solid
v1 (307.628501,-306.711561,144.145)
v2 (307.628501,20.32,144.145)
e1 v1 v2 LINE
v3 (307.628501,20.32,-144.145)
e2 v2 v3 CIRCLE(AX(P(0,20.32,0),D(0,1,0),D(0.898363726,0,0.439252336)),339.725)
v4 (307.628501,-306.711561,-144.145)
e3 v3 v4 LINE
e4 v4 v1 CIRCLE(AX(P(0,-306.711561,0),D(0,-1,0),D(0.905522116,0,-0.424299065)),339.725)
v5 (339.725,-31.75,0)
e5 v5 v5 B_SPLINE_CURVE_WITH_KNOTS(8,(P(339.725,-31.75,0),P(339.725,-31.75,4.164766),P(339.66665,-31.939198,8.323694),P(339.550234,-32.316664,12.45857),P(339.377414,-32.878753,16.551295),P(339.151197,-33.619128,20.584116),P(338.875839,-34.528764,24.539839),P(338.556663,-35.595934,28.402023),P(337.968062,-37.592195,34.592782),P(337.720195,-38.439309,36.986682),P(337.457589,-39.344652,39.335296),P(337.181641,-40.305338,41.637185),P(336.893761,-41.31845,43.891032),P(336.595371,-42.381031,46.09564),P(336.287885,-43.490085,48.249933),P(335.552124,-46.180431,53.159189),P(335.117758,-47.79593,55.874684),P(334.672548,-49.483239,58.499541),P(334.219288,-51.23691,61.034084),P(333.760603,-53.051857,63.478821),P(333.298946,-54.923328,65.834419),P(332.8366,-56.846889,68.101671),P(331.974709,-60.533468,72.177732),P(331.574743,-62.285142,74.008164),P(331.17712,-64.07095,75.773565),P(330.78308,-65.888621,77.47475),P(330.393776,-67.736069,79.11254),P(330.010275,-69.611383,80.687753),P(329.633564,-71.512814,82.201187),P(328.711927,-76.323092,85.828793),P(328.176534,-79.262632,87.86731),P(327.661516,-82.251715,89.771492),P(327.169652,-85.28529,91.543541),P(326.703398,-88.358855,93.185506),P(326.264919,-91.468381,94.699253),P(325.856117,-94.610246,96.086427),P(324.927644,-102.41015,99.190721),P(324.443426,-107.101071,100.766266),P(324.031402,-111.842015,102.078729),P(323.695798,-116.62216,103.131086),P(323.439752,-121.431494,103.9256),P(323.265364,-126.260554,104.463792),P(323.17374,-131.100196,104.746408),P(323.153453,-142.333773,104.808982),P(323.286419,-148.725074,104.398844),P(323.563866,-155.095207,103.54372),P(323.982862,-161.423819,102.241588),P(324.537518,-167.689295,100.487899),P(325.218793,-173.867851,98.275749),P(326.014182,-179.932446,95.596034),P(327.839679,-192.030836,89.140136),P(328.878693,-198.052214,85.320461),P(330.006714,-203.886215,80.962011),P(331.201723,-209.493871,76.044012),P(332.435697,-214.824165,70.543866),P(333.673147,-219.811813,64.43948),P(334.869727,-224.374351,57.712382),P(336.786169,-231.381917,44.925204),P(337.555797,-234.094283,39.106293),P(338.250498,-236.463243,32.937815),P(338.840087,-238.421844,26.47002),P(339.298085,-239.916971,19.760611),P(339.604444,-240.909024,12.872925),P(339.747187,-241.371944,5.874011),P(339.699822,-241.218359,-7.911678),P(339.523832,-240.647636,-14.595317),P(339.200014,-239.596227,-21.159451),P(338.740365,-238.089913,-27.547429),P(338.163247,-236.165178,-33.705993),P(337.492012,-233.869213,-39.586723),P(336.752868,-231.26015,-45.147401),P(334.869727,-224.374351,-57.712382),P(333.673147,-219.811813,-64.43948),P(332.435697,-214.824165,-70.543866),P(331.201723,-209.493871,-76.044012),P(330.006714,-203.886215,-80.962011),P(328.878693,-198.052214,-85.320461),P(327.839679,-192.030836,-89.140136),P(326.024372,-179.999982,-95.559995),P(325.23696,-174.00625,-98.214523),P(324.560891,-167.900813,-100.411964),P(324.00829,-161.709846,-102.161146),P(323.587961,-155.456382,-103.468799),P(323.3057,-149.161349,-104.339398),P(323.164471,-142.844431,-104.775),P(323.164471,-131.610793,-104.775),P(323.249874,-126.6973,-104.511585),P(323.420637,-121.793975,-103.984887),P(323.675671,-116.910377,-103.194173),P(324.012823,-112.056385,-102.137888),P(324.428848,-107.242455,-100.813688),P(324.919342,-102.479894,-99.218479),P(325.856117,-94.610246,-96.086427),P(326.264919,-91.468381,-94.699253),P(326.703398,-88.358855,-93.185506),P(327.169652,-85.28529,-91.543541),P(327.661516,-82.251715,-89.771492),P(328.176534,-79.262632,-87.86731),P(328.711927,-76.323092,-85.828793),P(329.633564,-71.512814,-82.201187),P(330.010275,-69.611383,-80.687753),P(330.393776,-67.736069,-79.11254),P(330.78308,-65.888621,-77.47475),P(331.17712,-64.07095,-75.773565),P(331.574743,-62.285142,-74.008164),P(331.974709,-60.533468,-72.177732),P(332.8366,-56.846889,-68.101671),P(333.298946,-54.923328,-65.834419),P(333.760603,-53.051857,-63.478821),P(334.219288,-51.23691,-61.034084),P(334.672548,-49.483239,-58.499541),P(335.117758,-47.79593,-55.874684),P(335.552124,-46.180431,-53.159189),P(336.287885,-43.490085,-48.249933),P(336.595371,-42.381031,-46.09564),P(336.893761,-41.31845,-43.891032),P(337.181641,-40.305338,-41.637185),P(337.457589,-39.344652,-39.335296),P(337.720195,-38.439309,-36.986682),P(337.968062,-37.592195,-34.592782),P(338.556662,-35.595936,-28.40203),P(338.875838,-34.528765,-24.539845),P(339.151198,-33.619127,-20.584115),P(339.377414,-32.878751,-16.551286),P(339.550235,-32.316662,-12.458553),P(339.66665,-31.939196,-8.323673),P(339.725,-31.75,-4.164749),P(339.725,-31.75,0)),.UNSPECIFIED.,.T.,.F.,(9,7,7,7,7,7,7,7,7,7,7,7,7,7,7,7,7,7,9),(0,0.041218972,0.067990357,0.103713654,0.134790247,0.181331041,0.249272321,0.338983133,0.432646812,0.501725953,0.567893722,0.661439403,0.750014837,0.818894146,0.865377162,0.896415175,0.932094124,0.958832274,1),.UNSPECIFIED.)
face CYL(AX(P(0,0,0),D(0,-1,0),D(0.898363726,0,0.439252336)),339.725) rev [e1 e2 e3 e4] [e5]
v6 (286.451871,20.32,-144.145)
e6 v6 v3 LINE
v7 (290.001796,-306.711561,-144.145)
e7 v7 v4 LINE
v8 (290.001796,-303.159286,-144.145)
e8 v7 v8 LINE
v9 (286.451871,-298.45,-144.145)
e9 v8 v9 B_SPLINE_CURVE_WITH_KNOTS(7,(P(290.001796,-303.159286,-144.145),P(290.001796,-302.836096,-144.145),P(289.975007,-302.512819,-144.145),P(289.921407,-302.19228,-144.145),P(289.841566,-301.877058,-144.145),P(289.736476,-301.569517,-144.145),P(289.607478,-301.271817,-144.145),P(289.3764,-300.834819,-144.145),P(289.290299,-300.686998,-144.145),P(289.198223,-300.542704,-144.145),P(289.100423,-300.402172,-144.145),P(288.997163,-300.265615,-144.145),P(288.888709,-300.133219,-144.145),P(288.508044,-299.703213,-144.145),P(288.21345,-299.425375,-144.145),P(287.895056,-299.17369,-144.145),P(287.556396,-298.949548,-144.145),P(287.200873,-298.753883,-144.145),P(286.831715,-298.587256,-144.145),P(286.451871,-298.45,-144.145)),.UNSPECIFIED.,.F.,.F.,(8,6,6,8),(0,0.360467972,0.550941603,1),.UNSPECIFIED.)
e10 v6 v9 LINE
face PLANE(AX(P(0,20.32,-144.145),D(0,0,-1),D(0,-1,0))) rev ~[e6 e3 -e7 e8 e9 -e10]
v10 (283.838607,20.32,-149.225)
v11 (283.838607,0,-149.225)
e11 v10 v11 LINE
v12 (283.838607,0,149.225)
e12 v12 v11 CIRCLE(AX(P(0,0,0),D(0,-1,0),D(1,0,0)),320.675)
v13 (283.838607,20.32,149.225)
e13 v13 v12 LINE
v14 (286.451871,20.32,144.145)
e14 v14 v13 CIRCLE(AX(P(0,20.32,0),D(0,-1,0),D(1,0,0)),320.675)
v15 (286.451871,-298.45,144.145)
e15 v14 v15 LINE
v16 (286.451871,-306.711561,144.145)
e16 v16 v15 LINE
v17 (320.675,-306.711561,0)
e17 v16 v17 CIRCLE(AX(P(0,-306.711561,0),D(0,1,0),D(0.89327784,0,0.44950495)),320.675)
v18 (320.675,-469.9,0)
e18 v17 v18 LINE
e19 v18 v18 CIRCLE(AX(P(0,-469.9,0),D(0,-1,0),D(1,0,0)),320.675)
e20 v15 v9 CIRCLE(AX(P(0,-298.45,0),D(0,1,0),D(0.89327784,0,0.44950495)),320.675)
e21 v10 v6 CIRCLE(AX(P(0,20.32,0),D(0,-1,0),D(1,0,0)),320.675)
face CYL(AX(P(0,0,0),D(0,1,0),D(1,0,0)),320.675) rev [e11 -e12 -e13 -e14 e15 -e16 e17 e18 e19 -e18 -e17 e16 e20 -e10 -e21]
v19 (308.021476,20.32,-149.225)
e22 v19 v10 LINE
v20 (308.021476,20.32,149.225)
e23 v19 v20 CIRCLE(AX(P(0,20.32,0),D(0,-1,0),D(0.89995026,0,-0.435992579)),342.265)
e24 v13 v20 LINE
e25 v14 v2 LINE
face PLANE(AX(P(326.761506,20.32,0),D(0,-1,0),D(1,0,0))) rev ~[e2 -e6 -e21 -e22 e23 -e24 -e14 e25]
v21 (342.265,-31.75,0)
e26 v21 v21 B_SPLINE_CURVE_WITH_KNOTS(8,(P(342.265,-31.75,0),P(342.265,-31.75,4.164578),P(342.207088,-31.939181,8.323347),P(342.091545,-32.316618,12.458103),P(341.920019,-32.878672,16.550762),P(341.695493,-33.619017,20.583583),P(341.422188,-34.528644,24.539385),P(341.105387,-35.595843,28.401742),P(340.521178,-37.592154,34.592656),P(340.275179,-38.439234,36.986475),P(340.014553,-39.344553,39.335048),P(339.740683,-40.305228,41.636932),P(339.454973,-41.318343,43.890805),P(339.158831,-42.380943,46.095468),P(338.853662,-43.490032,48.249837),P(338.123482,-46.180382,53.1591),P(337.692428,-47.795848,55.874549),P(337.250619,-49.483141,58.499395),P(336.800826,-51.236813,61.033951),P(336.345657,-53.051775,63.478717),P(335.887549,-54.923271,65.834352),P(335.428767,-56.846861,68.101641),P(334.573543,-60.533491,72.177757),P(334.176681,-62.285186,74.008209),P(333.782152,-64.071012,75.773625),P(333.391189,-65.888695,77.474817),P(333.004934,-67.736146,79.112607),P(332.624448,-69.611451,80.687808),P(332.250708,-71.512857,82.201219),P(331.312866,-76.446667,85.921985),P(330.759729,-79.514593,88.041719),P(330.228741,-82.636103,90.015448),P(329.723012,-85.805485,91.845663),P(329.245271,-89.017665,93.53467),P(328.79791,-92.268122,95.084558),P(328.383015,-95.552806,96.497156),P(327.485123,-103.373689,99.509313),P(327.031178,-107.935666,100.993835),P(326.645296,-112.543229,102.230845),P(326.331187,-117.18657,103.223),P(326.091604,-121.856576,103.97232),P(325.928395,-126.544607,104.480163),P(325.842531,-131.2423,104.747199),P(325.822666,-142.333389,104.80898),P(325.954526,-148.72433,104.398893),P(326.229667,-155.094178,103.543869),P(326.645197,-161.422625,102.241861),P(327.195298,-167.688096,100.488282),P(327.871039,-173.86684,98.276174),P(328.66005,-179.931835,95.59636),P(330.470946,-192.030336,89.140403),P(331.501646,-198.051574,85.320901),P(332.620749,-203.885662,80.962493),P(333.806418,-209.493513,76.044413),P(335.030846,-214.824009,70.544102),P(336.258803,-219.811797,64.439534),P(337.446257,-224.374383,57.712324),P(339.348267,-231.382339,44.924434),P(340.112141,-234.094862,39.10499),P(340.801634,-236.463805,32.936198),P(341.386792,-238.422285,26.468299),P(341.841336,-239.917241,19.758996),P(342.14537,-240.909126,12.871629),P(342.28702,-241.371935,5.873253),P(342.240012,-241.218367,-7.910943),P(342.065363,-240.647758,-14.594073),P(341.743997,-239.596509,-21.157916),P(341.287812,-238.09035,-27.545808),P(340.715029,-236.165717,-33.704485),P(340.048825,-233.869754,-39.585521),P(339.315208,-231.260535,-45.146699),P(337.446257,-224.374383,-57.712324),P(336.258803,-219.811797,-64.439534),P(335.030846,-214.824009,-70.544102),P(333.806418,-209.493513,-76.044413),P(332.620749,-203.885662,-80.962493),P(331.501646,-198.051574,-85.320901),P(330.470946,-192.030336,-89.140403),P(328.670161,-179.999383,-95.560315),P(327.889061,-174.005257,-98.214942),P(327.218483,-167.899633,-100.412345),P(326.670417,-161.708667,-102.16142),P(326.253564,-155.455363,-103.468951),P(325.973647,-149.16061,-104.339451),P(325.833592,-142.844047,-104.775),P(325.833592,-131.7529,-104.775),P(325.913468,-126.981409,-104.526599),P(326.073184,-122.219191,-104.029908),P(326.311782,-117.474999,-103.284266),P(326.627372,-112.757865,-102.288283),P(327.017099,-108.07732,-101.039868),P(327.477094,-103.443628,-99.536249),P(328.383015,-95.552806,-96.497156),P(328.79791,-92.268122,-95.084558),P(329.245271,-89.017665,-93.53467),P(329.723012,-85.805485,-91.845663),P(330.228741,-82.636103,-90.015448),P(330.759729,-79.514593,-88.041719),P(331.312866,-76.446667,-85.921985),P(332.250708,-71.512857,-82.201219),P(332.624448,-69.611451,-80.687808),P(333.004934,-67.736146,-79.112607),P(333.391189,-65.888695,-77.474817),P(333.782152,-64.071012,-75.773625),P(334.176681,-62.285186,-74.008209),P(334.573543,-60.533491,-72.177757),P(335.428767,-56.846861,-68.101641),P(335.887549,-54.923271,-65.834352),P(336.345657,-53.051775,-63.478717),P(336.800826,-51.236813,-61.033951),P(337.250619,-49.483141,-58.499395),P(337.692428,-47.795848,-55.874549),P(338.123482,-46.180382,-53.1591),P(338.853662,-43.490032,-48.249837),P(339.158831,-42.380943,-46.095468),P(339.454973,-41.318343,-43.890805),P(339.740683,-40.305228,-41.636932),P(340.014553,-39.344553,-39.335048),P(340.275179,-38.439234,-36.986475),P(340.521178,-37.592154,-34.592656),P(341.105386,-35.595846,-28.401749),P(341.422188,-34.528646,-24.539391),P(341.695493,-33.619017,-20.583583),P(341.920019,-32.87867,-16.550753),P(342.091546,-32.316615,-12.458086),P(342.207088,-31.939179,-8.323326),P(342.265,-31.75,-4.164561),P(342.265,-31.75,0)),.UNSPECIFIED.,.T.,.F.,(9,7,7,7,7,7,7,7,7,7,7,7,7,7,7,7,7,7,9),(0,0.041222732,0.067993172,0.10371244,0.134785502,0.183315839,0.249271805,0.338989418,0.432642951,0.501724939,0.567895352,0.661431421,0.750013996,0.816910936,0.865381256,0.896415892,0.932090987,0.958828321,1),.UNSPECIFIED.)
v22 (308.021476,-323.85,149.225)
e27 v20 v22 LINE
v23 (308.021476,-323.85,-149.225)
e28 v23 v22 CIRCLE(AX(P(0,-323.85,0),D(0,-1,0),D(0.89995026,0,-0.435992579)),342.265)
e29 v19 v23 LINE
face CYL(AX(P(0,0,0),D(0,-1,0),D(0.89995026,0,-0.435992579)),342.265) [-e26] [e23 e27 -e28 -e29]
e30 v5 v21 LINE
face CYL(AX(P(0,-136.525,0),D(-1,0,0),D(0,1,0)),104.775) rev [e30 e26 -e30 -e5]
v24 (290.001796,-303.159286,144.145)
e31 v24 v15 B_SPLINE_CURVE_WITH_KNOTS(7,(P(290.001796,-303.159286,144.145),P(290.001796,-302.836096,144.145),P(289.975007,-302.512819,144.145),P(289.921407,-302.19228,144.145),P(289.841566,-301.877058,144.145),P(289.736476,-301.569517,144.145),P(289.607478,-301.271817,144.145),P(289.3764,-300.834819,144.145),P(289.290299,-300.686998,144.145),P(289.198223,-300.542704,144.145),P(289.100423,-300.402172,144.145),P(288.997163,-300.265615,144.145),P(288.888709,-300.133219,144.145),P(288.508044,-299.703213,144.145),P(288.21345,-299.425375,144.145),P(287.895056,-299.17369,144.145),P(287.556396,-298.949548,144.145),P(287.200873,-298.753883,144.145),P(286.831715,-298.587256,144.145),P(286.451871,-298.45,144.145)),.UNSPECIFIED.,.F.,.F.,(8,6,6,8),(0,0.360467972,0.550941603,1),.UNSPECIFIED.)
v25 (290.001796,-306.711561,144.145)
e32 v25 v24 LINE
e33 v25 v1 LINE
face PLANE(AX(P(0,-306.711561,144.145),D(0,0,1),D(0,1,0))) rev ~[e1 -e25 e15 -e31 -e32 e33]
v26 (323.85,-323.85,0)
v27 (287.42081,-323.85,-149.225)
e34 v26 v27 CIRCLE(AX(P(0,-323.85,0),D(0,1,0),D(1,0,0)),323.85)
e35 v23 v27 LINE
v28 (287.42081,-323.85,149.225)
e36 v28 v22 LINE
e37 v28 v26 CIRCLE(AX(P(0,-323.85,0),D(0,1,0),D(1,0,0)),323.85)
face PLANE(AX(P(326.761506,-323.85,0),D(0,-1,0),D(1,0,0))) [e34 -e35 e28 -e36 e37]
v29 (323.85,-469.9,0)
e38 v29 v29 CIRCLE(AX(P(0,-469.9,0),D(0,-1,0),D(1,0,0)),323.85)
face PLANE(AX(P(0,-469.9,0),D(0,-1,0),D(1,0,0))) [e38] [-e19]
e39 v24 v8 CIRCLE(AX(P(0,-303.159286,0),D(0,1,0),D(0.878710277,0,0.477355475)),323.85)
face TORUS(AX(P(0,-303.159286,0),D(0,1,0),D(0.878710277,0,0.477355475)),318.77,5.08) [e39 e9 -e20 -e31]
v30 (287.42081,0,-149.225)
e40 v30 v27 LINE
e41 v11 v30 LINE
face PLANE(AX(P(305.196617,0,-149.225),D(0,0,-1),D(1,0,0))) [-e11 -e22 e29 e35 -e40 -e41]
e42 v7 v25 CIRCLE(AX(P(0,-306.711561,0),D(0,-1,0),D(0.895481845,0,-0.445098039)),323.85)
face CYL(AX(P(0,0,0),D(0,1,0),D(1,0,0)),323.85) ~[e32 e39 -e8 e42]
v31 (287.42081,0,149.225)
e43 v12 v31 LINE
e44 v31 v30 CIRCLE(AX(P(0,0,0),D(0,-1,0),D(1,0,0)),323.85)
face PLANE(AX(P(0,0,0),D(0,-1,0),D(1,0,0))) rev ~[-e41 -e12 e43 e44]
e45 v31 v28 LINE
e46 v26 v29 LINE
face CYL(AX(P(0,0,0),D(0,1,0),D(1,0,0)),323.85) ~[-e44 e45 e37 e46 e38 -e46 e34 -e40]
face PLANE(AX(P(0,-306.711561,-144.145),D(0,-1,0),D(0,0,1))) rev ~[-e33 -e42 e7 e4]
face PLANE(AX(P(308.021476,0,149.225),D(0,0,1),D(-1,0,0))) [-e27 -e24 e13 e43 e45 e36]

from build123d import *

# Parameters (mm, degrees)
F0_R        = 323.85
F0_R_2      = 320.675
F1_DEPTH    = 469.9
F2_W        = 298.45
F2_H        = 298.45
F3_DEPTH    = 595.884
F5_DEPTH    = 612.14
F6_T4_ANGLE = 57.0256517653
F7_R        = 669.2625565618
F7_R_2      = 339.725
F7_R_3      = 320.675
F8_DEPTH    = 561.34
F10_DEPTH   = 323.85
F11_R       = 104.775
F12_DEPTH   = 947.42
F13_DEPTH   = 20.32


# Not quite as in the source:
# - a fillet or chamfer that OpenCascade refuses, or shapes differently, is made with other operations: its cross-section is extruded or revolved along the edge and cut away or added


with BuildPart() as f1:
    # F0 (on Front) → F1 (new body)
    with BuildSketch(Plane.XZ):
        Circle(F0_R)
        Circle(F0_R_2, mode=Mode.SUBTRACT)
    extrude(amount=F1_DEPTH)

    # F2 (on Right) → F3 (cut)
    with BuildSketch(Plane.YZ):
        with Locations((-149.225, 0)):
            Rectangle(F2_W, F2_H)
    extrude(amount=F3_DEPTH, mode=Mode.SUBTRACT)

    # F4 (on Right) → F5 (join)
    with BuildSketch(Plane.YZ):
        Polygon((20.32, 149.225), (0, 149.225), (-323.85, 149.225), (-323.85, -149.225), (0, -149.225), (20.32, -149.225), (20.32, -144.145), (0, -144.145), (-17.1384390951, -144.145), (-306.7115609049, -144.145), (-306.7115609049, 144.145), (-17.1384390951, 144.145), (0, 144.145), (20.32, 144.145), align=None)
    extrude(amount=F5_DEPTH)

    # F6: fillet of radius 5.08 on 1 edges, made by hand


with BuildPart() as f6_tool2:
    # F6_s3 → F6_t4 (revolve)
    with BuildSketch(Plane(origin=(0, 0, 0), x_dir=(0, 1, 0), z_dir=(-0.4773554749, 0, 0.8787102768))):
        with BuildLine():
            ThreePointArc((-303.1592860393, -323.85), (-300.3194797079, -322.9821134838), (-298.45, -320.675))
            Line((-298.45, -320.675), (-298.45, -323.85))
            Line((-298.45, -323.85), (-303.1592860393, -323.85))
        make_face()
    revolve(axis=Axis((0, -298.45, 0), (0, 1, 0)), revolution_arc=F6_T4_ANGLE)

    split(bisect_by=Plane.XY.offset(-144.145), keep=Keep.TOP)

    split(bisect_by=Plane.XY.offset(144.145), keep=Keep.BOTTOM)


with BuildPart() as f1_1:
    add(f1.part)

    # F6_t1: cut F6_tool2
    add(f6_tool2.part, mode=Mode.SUBTRACT)

    # F7 (on Front) → F8 (cut, symmetric)
    with BuildSketch(Plane.XZ):
        Circle(F7_R)
        Circle(F7_R_2, mode=Mode.SUBTRACT)
        Circle(F7_R_3)
    extrude(amount=F8_DEPTH, both=True, mode=Mode.SUBTRACT)

    # F9 (on Front) → F10 (join, through all)
    with BuildSketch(Plane.XZ):
        with BuildLine():
            ThreePointArc((305.1966169537, 149.225), (339.725, 0), (305.1966169537, -149.225))
            Line((305.1966169537, -149.225), (308.0214758747, -149.225))
            ThreePointArc((308.0214758747, -149.225), (342.265, 0), (308.0214758747, 149.225))
            Line((308.0214758747, 149.225), (305.1966169537, 149.225))
        make_face()
    extrude(amount=F10_DEPTH)

    # F11 (on Right) → F12 (cut)
    with BuildSketch(Plane.YZ):
        with Locations((-136.525, 0)):
            Circle(F11_R)
    extrude(amount=F12_DEPTH, mode=Mode.SUBTRACT)

    # F9 (on Front) → F13 (join)
    with BuildSketch(Plane.XZ):
        with BuildLine():
            ThreePointArc((305.1966169537, 149.225), (339.725, 0), (305.1966169537, -149.225))
            Line((305.1966169537, -149.225), (308.0214758747, -149.225))
            ThreePointArc((308.0214758747, -149.225), (342.265, 0), (308.0214758747, 149.225))
            Line((308.0214758747, 149.225), (305.1966169537, 149.225))
        make_face()
    extrude(amount=-F13_DEPTH)


solid = f1_1.part
